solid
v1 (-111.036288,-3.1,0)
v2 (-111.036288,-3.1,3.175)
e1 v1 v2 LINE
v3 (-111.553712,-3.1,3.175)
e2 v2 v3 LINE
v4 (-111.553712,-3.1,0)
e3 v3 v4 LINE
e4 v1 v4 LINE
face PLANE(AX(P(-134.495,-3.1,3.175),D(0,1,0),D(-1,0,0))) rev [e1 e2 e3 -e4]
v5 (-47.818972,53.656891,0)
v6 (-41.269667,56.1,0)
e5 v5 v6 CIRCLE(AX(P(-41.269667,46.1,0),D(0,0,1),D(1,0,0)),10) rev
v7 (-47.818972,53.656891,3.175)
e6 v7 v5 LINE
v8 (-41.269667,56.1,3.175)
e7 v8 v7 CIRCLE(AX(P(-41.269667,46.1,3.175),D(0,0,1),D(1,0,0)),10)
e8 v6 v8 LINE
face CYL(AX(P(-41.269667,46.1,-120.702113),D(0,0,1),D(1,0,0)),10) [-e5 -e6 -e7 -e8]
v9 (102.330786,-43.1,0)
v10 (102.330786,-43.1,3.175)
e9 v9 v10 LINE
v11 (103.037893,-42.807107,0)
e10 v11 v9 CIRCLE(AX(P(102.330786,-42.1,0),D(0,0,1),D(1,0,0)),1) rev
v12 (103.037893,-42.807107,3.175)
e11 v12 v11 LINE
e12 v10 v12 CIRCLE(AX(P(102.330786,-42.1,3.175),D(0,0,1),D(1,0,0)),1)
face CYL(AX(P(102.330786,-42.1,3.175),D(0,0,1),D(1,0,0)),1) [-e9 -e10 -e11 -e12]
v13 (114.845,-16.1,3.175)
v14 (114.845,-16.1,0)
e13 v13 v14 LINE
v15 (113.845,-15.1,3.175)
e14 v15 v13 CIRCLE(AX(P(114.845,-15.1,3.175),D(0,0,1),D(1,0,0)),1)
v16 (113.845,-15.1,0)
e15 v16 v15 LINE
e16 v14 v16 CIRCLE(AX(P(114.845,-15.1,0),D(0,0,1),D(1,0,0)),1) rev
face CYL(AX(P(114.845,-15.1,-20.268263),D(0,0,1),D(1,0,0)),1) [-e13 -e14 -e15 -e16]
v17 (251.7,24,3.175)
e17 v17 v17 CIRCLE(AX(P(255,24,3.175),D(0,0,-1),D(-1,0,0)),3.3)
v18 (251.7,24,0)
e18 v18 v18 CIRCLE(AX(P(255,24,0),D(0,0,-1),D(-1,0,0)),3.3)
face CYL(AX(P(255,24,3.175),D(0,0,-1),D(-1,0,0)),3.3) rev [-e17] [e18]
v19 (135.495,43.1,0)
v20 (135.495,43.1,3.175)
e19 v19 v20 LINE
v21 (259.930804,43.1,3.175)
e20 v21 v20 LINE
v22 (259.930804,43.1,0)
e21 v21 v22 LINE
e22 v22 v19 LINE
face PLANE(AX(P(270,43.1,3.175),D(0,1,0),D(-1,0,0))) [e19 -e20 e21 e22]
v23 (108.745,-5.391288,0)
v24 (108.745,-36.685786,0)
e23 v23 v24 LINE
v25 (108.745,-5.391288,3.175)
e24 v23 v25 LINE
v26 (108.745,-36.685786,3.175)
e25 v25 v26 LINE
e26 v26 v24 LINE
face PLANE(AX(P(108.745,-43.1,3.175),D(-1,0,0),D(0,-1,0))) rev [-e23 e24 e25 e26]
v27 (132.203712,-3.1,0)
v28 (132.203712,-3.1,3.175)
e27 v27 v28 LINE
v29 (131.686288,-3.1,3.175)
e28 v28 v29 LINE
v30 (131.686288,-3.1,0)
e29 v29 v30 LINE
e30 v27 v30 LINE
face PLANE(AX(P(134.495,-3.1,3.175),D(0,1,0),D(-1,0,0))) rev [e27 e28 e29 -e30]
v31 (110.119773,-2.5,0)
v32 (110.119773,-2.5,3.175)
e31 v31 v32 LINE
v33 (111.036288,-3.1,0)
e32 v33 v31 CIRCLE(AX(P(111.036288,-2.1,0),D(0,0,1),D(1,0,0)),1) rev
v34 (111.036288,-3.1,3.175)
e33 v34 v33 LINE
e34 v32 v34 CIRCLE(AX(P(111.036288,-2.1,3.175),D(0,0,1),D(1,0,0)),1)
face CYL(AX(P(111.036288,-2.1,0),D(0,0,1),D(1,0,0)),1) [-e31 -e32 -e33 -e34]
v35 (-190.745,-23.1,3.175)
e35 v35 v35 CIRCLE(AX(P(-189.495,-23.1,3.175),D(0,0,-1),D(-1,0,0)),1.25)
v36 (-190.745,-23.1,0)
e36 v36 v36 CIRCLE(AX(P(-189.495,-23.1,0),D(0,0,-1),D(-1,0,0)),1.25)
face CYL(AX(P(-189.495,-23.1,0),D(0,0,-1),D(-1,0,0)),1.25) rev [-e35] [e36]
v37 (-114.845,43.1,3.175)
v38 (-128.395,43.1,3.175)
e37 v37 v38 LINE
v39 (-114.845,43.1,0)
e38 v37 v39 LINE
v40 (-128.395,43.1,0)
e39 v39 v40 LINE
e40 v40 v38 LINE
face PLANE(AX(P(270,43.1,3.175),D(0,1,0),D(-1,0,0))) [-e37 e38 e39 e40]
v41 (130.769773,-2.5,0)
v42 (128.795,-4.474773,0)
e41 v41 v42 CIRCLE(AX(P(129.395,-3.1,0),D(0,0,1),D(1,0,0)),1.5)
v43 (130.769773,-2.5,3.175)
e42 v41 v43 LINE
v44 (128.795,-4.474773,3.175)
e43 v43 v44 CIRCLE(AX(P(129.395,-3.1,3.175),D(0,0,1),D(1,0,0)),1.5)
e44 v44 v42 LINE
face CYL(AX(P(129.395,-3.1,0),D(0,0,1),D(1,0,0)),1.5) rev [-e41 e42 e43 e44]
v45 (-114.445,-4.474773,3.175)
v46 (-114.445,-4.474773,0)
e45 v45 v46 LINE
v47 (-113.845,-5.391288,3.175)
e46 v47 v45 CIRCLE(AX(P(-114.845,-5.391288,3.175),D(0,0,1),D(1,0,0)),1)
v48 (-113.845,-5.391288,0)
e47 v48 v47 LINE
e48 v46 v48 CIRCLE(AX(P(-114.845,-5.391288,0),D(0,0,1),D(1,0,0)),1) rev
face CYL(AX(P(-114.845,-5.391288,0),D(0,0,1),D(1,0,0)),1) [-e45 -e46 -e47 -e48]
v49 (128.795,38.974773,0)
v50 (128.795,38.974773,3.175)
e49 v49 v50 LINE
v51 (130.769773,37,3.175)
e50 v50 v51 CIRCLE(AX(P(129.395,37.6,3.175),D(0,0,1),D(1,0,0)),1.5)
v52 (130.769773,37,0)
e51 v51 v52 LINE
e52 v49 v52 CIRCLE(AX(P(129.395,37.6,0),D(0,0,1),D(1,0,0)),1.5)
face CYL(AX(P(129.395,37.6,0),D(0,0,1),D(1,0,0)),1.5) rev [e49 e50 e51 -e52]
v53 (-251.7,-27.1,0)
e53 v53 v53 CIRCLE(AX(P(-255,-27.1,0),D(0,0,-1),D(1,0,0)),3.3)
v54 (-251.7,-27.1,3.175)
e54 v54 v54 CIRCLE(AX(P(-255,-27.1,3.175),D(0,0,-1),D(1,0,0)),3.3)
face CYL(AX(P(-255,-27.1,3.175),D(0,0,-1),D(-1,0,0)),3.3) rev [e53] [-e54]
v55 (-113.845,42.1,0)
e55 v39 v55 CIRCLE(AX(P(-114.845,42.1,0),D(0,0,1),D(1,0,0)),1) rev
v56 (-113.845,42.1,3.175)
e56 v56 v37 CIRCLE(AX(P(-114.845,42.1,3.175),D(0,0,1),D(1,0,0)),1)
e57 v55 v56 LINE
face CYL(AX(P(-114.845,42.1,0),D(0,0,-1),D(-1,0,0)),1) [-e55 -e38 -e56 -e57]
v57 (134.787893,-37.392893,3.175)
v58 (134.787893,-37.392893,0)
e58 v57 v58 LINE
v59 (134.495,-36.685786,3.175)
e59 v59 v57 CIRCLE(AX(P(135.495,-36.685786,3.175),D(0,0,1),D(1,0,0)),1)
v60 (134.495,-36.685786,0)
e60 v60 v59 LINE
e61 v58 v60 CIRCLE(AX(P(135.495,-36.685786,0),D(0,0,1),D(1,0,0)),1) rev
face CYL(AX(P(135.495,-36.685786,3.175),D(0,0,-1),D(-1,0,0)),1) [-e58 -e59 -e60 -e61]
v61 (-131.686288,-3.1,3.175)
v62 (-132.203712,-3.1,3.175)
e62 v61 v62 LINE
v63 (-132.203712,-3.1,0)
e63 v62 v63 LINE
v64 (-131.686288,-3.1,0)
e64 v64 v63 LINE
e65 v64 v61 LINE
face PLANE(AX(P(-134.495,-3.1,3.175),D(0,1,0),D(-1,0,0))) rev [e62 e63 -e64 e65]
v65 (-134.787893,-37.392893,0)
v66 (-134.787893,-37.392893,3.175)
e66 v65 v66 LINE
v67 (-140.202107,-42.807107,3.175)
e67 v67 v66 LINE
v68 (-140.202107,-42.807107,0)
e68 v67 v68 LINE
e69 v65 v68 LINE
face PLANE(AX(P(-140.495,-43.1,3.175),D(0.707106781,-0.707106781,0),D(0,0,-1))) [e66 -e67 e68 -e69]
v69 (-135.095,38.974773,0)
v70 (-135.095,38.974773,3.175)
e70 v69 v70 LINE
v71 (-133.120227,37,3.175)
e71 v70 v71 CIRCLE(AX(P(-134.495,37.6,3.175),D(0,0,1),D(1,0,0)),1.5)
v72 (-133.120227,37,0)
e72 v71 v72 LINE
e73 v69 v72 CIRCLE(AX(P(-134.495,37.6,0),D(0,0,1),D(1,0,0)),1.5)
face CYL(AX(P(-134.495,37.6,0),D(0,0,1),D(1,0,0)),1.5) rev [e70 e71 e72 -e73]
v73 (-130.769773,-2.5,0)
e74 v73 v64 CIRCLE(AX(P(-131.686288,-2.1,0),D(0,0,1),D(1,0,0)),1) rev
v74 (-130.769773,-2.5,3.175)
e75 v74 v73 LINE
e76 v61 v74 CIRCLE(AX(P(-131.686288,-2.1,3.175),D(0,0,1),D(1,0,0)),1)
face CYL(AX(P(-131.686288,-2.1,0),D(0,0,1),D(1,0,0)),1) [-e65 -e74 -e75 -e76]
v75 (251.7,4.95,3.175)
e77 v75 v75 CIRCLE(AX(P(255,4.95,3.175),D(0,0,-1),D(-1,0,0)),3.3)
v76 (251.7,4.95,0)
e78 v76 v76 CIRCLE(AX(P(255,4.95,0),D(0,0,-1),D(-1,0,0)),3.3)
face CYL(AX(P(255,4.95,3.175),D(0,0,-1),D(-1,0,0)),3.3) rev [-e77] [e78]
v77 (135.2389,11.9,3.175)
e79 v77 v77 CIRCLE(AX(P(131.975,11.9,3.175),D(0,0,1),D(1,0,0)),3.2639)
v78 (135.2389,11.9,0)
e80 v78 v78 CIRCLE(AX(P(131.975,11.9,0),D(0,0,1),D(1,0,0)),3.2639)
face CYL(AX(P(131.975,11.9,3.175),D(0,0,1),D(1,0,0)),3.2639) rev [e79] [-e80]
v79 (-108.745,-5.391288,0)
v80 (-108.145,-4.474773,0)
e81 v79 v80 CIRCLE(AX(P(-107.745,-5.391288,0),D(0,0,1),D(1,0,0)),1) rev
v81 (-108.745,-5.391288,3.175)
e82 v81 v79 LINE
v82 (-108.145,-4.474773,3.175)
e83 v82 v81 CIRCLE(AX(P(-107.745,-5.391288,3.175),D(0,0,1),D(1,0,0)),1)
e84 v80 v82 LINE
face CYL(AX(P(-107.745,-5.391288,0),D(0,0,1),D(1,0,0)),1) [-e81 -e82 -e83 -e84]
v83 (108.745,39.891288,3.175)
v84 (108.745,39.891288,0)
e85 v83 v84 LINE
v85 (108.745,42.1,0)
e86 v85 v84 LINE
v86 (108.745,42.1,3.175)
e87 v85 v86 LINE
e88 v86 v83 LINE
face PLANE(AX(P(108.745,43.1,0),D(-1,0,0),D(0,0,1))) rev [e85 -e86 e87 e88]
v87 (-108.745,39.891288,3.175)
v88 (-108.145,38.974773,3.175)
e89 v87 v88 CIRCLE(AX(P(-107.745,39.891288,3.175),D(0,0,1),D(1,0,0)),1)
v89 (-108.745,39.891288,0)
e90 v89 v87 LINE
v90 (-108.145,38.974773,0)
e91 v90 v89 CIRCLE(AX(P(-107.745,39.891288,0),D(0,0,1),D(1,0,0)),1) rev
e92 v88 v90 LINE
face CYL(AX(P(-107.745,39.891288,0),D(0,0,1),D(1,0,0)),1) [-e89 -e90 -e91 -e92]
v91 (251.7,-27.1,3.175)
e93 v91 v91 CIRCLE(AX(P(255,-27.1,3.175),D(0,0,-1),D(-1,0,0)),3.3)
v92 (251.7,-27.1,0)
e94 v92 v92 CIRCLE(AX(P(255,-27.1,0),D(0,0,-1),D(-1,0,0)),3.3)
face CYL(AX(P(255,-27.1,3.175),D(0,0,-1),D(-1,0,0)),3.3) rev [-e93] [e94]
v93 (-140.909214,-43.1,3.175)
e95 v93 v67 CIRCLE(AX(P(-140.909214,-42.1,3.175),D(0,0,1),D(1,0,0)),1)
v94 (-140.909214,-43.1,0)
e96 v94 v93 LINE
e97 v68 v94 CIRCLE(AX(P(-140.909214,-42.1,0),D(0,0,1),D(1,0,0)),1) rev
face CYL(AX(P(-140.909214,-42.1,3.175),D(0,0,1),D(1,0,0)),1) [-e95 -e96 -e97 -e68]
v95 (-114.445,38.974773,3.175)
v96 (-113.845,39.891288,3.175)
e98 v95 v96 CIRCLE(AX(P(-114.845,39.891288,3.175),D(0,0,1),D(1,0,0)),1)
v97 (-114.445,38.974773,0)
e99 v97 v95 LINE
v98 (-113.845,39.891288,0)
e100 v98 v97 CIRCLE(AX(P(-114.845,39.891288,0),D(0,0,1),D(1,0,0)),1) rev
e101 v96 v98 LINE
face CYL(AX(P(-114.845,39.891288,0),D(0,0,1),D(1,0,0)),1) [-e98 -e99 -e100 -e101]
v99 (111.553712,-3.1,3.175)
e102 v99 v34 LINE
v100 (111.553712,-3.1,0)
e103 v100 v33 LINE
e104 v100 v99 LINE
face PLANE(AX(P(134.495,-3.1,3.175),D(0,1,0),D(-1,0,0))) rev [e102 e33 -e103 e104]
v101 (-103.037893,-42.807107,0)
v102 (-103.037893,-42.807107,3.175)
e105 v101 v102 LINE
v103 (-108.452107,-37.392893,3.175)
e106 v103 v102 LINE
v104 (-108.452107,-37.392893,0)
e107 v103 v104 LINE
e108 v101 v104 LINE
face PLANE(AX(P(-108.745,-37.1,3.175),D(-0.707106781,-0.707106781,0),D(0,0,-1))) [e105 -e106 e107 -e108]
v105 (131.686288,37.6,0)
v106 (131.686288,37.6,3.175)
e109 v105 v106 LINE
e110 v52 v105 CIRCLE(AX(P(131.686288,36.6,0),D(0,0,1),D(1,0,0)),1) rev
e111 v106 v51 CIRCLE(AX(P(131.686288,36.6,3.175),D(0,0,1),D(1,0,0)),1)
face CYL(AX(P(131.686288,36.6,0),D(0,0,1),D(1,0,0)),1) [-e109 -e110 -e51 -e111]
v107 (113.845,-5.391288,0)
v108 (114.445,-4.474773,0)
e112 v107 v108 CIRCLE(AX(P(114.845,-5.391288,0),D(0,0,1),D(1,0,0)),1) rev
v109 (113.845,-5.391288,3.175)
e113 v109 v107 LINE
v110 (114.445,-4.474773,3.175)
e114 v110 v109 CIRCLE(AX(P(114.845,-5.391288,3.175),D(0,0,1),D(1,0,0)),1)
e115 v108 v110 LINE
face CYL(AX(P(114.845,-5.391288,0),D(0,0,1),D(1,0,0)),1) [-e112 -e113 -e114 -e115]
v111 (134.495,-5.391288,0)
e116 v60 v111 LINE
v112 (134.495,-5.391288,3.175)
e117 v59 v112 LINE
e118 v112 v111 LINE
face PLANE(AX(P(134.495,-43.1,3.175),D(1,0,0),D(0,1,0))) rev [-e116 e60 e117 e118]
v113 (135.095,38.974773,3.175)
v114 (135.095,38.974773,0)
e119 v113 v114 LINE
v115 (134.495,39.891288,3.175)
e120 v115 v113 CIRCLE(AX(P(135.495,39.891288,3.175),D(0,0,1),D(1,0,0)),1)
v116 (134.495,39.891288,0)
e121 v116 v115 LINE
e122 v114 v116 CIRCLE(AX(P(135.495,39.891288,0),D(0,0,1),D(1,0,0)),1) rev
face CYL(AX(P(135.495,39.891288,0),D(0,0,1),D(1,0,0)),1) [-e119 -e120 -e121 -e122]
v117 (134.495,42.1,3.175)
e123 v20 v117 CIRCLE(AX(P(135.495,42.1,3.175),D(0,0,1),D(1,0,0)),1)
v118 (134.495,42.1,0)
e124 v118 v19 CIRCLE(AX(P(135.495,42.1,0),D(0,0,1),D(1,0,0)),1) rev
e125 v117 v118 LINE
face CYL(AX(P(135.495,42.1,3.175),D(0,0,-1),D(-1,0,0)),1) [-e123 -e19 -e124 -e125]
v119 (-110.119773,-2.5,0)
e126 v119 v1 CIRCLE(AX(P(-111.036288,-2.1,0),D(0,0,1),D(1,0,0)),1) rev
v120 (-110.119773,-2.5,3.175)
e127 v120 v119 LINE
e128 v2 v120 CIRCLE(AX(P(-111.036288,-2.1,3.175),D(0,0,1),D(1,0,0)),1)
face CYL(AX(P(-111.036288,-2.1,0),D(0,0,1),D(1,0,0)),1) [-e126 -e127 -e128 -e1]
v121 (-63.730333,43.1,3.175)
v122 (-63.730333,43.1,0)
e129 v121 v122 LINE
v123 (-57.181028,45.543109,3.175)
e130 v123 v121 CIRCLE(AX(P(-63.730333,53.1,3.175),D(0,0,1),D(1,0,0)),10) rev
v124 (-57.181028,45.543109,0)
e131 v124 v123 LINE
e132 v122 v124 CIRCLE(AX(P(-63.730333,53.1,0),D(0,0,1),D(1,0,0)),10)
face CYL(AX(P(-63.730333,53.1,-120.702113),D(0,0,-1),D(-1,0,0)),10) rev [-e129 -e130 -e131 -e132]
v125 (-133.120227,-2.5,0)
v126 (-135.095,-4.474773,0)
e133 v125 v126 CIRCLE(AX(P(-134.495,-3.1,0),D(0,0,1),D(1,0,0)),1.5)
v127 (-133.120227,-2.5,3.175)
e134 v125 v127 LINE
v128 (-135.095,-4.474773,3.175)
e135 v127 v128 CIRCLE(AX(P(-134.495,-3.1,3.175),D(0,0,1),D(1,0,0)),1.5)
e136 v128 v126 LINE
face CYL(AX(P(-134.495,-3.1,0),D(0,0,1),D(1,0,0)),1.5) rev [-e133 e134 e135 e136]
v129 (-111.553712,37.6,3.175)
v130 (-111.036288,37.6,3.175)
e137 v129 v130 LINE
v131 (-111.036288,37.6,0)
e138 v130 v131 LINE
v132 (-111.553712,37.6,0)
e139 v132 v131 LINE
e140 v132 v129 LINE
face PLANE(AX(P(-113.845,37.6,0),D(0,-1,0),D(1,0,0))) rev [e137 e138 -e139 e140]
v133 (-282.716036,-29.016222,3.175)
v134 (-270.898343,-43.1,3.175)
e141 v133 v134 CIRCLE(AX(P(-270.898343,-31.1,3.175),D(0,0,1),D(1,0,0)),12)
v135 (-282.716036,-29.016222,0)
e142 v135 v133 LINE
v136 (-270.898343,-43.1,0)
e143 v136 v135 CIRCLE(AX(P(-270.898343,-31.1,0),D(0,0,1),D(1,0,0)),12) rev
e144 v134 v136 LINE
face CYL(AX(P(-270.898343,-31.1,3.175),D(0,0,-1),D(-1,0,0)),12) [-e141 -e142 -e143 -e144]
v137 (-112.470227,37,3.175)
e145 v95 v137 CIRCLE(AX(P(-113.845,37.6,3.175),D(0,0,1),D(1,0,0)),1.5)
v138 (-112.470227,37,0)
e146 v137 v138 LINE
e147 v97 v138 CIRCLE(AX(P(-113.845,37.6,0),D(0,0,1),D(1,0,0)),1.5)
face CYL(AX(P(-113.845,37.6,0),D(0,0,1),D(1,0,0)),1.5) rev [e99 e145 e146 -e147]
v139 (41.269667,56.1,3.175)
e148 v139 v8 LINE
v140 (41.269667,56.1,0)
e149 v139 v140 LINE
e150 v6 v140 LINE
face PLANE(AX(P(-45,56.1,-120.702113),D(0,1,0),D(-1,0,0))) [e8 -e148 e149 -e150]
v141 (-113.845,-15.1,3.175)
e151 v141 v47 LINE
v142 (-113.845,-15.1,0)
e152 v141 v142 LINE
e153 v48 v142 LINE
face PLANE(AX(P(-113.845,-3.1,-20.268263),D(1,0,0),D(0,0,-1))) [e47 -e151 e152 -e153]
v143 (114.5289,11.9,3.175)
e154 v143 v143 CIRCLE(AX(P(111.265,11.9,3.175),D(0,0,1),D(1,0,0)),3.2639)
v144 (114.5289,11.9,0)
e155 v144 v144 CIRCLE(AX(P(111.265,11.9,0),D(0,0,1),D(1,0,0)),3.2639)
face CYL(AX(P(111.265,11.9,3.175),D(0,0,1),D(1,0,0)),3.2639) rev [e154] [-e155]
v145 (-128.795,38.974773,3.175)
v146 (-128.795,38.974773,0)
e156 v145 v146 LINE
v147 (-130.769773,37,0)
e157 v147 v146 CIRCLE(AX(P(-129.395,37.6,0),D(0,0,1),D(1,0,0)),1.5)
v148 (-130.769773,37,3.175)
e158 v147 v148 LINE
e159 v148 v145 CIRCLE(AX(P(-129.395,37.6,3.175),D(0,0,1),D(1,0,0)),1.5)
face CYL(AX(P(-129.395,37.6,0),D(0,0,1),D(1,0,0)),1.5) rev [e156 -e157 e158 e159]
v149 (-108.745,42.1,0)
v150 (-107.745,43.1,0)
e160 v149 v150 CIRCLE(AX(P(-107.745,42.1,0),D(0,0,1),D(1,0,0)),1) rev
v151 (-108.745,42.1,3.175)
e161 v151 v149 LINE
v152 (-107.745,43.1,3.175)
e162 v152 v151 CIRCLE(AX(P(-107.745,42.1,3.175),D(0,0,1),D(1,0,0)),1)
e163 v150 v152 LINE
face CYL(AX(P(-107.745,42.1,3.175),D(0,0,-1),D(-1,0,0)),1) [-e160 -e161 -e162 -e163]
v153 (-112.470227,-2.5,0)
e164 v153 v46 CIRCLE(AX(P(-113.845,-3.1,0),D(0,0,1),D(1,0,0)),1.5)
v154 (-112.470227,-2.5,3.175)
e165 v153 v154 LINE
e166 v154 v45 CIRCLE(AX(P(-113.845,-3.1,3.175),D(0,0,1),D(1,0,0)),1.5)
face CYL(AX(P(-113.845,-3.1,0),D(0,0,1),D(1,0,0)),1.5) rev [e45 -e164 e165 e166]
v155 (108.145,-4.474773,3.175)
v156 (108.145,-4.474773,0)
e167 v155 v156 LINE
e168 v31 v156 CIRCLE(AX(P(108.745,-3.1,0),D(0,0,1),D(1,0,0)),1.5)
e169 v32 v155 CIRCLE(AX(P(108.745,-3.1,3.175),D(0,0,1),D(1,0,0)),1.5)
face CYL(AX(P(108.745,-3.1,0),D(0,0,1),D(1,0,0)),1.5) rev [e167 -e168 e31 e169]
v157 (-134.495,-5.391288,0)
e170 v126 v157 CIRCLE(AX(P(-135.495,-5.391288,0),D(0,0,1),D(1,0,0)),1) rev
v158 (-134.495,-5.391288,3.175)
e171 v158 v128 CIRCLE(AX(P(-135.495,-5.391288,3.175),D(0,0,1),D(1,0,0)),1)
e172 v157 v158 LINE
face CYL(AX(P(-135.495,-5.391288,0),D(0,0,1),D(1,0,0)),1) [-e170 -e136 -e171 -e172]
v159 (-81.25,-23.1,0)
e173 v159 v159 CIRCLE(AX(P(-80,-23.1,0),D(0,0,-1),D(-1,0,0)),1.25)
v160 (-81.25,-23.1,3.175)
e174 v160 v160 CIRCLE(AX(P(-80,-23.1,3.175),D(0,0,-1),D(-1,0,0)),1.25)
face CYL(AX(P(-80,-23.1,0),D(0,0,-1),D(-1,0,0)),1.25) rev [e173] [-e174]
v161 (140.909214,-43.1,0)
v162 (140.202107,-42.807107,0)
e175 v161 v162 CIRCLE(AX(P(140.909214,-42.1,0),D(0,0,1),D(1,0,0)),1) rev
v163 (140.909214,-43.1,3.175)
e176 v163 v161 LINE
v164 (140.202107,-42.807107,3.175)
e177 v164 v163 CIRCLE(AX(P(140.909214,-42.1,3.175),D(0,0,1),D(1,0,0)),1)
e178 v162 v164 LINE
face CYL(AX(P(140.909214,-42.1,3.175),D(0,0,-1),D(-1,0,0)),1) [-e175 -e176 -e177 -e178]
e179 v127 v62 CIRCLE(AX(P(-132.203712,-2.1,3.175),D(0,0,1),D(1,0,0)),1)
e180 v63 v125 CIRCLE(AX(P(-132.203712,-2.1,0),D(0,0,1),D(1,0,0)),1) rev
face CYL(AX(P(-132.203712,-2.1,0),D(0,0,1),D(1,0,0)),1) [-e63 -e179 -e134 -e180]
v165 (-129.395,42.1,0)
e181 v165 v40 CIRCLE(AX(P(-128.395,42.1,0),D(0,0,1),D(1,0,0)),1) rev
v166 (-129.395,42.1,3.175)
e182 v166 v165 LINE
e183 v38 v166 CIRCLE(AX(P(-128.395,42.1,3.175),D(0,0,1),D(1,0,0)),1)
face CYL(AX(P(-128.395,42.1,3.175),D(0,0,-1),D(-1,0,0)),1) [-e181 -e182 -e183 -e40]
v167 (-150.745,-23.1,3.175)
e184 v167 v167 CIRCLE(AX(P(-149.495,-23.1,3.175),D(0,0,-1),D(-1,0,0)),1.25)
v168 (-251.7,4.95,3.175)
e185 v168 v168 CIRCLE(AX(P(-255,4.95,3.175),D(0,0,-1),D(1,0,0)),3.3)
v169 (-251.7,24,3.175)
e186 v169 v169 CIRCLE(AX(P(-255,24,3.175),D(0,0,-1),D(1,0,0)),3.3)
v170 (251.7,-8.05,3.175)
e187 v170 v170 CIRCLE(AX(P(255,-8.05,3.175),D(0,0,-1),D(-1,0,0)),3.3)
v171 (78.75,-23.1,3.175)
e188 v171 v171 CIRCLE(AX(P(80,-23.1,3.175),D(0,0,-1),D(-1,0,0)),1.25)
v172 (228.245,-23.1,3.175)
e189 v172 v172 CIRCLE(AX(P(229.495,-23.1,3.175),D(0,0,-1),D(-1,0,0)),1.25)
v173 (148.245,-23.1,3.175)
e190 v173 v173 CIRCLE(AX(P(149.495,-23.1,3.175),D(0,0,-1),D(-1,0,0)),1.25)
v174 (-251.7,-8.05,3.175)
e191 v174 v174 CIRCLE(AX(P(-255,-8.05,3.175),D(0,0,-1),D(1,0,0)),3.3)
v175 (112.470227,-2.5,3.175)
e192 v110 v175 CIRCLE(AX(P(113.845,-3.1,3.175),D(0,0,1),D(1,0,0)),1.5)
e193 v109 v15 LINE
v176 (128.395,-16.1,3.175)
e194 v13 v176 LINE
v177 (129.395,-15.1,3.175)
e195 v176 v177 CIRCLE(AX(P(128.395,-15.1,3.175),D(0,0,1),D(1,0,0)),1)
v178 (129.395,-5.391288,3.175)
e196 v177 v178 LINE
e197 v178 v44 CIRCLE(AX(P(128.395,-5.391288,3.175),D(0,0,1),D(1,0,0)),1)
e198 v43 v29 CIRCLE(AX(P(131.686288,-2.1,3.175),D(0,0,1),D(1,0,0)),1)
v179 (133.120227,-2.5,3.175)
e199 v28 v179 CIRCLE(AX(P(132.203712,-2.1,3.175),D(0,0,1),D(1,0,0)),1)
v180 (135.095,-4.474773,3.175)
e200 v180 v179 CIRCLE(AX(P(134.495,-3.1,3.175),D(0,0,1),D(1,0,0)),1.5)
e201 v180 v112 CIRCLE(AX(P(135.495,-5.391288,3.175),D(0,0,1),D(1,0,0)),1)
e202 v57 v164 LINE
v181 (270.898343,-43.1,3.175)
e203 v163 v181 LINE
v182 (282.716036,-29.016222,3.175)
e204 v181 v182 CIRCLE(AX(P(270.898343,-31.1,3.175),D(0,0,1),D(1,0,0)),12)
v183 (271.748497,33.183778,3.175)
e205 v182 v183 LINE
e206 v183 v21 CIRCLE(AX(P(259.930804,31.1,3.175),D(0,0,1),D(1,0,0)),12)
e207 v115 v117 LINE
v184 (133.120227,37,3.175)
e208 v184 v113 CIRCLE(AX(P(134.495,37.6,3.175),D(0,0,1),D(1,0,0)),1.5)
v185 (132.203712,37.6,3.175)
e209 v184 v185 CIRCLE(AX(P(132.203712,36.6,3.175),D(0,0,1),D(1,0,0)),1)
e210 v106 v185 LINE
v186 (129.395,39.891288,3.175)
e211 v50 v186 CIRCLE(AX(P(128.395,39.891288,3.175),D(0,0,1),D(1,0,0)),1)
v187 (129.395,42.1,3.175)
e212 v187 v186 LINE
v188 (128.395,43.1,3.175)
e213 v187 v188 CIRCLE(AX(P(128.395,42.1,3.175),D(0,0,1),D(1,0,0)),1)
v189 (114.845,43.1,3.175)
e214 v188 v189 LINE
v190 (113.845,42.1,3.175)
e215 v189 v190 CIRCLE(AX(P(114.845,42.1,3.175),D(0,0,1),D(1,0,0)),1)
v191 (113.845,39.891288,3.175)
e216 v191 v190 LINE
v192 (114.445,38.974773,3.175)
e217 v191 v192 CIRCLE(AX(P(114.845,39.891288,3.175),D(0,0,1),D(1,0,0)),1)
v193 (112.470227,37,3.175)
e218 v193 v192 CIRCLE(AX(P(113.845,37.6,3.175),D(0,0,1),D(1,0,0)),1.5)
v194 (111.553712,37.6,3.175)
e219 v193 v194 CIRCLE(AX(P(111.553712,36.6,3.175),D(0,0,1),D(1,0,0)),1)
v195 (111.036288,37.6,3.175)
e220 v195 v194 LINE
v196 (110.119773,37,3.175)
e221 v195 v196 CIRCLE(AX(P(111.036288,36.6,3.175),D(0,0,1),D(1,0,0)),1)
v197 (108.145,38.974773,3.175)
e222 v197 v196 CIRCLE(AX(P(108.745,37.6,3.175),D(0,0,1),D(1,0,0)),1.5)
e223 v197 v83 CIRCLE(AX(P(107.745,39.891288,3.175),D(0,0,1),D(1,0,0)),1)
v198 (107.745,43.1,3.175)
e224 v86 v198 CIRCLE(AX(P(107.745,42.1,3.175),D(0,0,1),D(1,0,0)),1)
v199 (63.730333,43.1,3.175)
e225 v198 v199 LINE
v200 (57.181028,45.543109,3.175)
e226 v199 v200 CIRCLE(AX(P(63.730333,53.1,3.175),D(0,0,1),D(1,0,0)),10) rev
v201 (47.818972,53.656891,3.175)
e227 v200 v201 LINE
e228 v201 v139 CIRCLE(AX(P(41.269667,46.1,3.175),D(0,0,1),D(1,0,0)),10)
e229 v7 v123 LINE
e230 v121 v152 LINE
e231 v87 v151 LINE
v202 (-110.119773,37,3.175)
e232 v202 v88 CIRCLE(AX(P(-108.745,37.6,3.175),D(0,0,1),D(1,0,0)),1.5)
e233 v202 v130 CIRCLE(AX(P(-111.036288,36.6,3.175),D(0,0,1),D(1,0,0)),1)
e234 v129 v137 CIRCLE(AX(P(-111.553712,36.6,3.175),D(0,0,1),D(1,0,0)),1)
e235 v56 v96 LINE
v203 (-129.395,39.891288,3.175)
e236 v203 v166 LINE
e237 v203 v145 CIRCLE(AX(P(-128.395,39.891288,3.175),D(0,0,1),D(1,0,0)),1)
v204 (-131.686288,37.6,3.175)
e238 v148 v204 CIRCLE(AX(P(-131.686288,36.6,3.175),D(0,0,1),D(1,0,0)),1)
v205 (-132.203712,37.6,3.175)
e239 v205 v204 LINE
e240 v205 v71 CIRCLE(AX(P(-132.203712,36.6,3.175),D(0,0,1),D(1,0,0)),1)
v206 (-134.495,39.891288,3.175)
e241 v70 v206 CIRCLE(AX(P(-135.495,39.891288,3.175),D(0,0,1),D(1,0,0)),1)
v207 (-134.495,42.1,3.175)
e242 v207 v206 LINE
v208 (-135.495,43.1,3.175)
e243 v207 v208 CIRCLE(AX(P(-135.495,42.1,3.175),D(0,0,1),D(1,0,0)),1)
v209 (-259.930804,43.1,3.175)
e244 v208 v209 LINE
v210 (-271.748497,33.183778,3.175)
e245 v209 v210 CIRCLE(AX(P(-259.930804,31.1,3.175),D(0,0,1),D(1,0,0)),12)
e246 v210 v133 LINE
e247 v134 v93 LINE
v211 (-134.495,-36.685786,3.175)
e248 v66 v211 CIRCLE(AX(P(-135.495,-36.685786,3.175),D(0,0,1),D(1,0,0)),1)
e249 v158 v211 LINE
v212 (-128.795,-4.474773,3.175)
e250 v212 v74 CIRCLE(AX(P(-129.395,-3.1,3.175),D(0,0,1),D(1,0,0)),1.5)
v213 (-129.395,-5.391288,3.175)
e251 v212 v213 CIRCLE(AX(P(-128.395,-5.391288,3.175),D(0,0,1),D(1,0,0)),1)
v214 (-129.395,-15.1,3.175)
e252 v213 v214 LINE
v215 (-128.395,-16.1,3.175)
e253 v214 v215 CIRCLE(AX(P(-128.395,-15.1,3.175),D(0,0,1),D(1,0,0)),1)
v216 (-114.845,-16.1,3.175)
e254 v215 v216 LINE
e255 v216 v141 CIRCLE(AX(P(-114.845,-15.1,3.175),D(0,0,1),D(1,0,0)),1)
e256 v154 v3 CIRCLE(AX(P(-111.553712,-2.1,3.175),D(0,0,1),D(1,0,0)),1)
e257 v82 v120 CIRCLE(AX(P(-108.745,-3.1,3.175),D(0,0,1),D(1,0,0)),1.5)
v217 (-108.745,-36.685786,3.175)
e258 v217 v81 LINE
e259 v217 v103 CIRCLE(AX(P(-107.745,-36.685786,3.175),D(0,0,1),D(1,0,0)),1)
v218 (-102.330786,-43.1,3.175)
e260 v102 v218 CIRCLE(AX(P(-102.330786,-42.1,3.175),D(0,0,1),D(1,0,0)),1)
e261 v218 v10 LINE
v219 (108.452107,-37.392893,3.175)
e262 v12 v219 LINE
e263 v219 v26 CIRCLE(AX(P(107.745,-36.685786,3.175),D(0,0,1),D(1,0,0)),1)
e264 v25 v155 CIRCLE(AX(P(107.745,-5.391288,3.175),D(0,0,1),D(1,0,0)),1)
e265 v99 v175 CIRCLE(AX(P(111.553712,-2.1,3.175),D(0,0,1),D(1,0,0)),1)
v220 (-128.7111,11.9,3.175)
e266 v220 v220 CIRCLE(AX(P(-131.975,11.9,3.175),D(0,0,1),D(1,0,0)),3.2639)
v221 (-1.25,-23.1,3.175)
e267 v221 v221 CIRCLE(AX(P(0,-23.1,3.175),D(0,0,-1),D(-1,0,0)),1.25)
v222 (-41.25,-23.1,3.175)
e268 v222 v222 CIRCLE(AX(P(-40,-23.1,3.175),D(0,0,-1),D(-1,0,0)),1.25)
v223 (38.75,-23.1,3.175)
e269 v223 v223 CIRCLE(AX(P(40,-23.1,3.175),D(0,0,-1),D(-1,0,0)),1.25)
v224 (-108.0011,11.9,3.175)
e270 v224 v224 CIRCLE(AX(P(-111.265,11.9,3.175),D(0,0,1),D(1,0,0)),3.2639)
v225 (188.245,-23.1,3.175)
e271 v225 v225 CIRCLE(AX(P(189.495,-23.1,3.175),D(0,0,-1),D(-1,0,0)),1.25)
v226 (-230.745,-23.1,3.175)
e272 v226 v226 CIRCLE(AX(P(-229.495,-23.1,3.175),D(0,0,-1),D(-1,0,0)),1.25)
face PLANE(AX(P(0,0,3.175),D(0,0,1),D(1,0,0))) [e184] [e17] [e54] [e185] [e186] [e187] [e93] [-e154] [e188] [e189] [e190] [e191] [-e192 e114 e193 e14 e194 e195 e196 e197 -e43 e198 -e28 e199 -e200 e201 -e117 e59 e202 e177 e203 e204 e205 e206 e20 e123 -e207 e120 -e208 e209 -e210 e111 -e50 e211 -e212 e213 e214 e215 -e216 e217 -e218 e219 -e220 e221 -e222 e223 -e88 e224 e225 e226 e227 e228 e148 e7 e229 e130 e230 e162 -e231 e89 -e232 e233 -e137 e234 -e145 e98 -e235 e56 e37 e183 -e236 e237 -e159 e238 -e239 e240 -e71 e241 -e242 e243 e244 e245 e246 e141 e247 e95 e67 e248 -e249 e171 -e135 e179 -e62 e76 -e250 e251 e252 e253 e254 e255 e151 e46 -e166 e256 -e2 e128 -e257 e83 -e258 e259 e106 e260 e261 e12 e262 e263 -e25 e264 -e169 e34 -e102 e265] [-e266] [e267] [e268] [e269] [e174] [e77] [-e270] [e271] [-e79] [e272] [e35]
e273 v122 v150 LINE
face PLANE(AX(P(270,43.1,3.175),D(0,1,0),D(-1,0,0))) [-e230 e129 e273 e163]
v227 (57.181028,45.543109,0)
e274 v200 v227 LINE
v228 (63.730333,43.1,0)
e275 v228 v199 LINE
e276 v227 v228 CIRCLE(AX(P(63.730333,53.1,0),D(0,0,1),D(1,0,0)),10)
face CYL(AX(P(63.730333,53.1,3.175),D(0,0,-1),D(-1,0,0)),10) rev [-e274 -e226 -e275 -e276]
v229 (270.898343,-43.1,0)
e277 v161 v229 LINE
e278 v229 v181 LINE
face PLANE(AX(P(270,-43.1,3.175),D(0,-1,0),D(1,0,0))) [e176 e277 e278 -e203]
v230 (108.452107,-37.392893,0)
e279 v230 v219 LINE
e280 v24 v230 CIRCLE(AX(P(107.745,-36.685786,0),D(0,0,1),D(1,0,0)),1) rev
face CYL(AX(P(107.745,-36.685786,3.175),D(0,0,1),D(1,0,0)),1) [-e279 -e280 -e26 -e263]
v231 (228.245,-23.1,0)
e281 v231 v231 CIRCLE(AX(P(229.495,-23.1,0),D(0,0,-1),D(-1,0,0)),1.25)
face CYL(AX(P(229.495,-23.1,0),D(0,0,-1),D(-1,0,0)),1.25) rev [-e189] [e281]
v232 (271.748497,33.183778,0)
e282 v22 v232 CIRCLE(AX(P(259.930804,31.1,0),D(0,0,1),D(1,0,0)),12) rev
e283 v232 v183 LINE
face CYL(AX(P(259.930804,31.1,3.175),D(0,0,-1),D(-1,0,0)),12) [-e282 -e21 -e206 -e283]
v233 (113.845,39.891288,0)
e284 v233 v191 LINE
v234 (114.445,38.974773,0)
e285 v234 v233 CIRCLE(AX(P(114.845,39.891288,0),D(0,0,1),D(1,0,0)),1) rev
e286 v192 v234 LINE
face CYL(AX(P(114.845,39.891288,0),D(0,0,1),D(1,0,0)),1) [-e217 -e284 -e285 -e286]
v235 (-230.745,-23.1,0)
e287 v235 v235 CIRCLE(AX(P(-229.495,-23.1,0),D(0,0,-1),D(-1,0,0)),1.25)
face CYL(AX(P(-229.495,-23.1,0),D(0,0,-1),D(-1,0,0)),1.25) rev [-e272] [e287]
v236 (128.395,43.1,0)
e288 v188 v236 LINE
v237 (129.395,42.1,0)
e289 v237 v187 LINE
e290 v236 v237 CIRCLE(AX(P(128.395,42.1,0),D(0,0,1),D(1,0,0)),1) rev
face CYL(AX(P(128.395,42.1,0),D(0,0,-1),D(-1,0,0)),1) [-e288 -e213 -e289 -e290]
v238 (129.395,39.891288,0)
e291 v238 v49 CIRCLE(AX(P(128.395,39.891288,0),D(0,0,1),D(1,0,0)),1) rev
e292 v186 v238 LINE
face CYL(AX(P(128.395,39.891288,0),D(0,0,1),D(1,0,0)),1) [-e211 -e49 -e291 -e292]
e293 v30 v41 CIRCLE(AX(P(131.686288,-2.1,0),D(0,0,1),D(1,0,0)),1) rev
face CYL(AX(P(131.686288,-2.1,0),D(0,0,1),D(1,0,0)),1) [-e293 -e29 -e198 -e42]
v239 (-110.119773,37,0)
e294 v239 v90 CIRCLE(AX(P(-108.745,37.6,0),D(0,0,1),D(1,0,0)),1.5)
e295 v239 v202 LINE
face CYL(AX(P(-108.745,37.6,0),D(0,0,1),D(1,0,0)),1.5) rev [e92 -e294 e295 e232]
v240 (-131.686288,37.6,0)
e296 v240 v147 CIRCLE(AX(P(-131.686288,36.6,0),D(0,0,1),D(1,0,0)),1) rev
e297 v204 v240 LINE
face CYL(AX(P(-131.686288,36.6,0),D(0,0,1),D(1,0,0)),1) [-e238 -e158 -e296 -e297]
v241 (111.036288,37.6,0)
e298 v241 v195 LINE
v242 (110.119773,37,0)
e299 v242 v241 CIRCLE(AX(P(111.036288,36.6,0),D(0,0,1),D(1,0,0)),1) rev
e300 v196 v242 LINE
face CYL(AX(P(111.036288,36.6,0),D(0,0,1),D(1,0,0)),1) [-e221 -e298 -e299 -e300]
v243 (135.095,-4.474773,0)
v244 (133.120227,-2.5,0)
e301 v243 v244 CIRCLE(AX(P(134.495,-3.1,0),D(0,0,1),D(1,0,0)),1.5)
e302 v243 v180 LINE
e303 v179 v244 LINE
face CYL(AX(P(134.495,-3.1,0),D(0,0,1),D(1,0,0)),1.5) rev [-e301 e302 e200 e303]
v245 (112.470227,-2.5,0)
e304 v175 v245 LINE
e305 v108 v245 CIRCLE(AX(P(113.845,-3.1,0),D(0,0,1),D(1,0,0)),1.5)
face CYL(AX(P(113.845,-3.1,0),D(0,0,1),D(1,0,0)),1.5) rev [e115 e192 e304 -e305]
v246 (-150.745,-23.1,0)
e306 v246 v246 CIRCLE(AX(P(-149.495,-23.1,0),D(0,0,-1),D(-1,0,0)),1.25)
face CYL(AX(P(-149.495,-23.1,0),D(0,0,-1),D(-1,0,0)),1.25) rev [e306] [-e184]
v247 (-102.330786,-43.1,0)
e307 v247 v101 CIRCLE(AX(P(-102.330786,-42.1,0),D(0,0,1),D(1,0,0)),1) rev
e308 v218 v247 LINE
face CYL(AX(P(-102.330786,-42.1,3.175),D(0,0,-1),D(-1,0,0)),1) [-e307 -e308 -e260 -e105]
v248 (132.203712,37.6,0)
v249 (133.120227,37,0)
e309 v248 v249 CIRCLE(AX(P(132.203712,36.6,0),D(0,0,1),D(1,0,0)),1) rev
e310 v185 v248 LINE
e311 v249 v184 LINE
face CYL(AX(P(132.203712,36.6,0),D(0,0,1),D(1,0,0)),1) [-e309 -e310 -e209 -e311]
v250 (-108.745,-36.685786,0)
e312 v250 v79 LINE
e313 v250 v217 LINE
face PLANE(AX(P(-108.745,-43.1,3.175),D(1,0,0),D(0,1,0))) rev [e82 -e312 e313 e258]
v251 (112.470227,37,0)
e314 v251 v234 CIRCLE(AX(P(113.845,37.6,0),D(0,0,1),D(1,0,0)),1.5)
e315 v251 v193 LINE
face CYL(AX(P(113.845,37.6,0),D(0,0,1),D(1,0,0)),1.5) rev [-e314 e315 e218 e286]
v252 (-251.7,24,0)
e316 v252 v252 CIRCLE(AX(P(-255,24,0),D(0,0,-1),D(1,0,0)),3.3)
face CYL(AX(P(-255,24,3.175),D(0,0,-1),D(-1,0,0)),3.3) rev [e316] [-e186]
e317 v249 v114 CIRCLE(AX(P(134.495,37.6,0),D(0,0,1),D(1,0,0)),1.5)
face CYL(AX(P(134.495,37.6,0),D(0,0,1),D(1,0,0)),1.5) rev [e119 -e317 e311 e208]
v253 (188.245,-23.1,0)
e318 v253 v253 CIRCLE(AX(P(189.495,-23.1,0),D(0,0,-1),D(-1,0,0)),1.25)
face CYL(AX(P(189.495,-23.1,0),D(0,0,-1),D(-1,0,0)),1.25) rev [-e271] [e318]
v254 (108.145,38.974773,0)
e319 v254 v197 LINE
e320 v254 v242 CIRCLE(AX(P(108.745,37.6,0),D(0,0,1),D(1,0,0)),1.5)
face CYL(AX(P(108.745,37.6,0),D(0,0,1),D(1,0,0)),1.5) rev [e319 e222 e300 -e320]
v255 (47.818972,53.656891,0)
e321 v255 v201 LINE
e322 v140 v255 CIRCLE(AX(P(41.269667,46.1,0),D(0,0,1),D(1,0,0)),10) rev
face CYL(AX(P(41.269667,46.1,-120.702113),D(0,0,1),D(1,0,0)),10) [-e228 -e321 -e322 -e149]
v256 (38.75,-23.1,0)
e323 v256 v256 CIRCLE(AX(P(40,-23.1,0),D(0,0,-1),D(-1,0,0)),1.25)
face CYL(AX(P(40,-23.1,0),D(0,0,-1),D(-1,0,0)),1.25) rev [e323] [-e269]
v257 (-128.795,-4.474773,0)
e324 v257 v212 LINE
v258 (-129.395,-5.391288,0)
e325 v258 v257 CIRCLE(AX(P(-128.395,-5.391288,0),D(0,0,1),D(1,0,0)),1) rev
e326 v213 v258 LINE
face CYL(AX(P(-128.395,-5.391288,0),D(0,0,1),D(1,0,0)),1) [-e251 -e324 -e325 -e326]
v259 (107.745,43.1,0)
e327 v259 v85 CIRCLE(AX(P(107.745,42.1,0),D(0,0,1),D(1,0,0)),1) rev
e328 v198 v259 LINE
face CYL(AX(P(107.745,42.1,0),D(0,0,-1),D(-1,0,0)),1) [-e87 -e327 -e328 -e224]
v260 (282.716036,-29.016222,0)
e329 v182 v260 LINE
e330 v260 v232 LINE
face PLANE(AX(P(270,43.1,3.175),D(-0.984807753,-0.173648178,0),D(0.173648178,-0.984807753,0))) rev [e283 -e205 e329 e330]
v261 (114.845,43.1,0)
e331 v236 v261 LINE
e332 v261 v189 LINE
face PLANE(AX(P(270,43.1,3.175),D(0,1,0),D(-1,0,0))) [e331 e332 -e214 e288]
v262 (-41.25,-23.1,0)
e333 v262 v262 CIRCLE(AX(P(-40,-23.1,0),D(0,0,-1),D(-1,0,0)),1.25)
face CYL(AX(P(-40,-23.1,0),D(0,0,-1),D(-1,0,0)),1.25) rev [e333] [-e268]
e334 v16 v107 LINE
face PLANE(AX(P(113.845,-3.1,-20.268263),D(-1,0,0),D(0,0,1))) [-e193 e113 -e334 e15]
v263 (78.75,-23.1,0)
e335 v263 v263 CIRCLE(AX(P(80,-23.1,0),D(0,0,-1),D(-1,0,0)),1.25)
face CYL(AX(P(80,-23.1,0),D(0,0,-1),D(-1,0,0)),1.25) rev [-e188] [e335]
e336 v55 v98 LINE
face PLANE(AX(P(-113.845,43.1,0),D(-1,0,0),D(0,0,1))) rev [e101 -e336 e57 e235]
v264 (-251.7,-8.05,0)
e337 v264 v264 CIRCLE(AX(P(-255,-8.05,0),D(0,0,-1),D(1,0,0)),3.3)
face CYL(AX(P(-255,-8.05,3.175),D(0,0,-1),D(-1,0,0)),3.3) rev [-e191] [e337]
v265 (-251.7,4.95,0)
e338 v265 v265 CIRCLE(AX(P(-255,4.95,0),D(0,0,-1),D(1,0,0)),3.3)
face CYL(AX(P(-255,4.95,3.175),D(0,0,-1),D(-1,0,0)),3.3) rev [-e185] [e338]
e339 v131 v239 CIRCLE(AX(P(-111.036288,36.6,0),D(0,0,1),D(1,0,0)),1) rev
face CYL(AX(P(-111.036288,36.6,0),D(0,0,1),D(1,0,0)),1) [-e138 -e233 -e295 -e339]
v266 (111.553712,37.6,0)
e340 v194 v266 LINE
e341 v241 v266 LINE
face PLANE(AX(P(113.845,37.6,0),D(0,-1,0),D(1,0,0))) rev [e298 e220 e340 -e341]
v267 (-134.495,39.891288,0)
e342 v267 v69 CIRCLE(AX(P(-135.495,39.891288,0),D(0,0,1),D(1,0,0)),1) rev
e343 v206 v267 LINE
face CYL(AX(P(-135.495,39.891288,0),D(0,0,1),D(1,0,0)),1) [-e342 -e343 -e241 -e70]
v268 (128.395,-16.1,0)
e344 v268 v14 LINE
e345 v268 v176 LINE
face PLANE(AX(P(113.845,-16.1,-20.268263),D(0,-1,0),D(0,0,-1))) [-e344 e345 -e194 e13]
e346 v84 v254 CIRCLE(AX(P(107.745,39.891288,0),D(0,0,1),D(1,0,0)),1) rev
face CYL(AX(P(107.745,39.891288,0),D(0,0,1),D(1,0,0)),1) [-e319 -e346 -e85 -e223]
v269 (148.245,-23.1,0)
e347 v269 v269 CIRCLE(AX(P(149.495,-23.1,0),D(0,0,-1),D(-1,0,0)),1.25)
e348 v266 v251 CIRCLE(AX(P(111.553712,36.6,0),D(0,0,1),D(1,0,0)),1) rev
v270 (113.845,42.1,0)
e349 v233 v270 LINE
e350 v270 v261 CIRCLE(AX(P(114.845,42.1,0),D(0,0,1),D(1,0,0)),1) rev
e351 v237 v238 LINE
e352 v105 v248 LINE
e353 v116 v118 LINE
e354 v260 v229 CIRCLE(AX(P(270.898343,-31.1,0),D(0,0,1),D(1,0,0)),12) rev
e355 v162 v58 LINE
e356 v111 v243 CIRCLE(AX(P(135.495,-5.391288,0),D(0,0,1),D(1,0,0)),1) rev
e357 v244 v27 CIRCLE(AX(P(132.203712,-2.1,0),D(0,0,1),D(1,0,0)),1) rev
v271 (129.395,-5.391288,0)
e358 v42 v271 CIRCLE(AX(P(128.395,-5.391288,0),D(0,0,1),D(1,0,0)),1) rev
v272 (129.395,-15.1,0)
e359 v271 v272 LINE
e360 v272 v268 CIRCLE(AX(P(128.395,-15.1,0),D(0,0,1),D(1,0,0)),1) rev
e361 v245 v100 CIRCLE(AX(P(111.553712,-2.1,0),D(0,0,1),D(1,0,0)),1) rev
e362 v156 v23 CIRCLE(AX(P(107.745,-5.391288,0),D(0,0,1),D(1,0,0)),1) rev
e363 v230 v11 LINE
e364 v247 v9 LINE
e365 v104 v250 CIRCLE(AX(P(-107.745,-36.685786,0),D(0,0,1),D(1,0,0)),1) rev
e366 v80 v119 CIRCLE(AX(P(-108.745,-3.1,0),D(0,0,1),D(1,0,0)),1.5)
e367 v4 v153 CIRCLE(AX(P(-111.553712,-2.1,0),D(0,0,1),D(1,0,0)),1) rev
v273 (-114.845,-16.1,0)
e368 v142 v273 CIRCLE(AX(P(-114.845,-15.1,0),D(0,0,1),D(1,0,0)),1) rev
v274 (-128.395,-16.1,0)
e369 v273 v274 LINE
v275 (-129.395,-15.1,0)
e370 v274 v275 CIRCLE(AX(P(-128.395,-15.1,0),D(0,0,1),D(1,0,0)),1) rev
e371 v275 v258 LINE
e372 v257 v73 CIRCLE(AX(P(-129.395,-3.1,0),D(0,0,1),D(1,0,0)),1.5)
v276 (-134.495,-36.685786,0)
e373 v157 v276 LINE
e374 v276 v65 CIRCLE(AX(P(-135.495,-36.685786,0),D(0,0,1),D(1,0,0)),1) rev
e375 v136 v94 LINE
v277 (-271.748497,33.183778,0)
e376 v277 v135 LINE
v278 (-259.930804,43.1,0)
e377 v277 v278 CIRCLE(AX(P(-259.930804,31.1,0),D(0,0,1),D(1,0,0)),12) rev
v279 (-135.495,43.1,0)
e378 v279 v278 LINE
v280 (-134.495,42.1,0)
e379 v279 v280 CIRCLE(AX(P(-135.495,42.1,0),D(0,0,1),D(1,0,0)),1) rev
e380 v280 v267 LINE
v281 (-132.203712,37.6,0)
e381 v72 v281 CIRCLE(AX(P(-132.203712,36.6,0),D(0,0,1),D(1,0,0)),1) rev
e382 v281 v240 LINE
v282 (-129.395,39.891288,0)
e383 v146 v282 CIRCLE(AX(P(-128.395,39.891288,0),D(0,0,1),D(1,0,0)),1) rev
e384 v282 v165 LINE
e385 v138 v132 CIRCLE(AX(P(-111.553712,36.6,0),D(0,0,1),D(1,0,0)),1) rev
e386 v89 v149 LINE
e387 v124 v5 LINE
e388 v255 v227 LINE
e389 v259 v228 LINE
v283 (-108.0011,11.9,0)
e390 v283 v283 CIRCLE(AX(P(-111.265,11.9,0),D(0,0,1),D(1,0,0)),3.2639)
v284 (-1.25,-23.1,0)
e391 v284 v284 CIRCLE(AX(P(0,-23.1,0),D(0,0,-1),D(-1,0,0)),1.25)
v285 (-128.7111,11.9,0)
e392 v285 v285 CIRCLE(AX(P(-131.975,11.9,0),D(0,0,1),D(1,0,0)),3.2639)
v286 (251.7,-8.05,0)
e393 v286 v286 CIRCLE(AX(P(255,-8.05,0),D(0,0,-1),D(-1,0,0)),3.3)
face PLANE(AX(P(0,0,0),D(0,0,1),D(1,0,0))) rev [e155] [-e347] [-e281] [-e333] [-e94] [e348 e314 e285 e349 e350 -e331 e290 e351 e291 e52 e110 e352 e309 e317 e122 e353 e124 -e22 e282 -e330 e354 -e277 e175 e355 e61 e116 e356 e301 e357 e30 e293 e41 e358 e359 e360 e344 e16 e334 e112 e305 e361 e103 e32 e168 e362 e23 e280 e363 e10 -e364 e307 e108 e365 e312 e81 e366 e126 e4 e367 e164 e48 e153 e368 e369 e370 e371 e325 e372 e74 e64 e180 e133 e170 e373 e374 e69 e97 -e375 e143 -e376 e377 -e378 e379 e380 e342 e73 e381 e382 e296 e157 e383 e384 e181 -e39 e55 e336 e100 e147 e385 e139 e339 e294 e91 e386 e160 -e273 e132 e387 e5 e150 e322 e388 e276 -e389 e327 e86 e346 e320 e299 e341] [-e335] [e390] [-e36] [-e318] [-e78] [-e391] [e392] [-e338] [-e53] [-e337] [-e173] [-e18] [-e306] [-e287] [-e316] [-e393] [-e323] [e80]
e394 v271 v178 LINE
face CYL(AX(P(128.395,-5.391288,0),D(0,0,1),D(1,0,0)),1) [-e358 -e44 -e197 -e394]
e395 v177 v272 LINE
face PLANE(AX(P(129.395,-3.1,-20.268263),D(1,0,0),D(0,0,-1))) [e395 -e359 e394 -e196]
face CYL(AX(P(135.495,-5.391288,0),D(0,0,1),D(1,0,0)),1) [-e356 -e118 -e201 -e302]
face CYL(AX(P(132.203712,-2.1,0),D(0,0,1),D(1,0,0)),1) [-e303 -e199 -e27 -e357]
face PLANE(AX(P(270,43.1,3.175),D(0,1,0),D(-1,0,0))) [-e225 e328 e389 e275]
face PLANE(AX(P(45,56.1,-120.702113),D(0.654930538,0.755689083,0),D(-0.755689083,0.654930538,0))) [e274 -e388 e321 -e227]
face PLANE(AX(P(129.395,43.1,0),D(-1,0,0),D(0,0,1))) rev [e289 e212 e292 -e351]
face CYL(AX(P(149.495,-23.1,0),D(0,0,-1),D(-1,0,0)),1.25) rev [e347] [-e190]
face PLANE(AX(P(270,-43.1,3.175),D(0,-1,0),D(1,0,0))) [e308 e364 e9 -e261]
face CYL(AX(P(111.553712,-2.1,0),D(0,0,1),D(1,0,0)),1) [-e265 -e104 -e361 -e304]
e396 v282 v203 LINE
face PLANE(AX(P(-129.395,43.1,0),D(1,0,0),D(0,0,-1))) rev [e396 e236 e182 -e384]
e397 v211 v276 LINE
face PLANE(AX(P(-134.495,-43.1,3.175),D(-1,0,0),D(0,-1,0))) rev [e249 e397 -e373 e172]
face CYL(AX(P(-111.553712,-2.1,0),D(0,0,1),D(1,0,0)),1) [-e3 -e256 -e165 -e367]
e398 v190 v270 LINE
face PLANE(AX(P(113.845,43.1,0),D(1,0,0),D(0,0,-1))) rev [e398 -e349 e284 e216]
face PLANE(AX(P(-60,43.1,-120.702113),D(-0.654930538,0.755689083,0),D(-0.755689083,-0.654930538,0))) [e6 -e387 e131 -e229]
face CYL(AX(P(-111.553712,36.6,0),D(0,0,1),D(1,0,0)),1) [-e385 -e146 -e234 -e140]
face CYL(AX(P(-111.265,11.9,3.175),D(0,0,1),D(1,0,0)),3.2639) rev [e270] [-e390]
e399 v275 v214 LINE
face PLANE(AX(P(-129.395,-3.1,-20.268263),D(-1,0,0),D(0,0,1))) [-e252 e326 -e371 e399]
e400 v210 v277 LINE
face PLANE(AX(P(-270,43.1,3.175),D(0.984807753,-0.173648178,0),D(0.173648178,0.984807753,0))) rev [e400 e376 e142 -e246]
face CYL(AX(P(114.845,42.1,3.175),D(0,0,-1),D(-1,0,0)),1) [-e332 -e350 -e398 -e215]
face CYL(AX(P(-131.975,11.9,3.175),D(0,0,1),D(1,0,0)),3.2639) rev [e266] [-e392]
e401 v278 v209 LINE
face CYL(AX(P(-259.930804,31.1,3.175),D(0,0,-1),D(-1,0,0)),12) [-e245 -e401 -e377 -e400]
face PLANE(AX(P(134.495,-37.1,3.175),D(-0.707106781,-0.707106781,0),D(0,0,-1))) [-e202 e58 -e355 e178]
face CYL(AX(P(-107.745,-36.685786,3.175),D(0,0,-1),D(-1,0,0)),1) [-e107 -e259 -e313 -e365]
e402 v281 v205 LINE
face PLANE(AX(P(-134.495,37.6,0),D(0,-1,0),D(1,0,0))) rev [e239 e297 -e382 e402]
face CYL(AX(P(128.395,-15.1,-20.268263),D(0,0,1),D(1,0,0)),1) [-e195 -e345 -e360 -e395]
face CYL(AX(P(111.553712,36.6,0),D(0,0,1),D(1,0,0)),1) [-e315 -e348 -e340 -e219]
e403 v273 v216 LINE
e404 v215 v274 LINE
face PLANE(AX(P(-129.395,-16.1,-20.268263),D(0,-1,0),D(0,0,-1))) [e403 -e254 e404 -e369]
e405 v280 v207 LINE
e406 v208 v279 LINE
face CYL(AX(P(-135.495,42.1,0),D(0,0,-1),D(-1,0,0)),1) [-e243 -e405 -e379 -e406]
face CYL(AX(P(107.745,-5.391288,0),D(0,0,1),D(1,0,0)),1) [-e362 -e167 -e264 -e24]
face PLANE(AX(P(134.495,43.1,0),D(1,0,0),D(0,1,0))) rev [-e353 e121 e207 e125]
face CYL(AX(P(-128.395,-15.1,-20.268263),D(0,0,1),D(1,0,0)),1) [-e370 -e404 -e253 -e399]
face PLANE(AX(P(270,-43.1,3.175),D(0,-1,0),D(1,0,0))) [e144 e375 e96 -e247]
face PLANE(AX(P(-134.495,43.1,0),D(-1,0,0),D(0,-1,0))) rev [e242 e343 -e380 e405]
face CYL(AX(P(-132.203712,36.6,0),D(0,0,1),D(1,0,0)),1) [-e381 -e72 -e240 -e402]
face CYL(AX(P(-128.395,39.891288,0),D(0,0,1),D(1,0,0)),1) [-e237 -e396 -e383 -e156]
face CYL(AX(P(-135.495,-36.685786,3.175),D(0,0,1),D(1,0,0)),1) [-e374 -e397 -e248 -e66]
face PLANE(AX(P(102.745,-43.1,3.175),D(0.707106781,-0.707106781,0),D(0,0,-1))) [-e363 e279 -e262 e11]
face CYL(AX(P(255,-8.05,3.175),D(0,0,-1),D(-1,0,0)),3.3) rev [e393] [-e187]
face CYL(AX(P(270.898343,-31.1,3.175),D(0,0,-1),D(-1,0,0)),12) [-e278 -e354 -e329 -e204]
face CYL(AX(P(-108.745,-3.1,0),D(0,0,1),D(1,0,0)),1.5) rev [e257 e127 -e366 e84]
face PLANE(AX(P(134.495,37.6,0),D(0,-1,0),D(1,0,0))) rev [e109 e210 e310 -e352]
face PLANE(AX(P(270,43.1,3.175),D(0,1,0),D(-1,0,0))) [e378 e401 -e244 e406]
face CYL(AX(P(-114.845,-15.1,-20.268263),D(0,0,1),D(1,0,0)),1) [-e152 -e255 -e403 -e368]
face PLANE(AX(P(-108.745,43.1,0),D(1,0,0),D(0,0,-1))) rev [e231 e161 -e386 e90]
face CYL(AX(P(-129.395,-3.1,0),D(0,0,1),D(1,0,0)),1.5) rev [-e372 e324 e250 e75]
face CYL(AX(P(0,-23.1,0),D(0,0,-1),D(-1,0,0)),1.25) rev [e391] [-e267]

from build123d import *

# Parameters (mm, degrees)
SKETCH1_W               = 540
SKETCH1_H               = 86.2
BOSS_EXTRUDE1_DEPTH     = 3.175
SKETCH2_W               = 25.75
SKETCH2_H               = 40
CUT_EXTRUDE1_DEPTH      = 274.436812856
F_1_4_CLEARANCE_HOLE1_D = 6.5278
DRAFT1_ANGLE            = 10
FILLET1_R               = 12
CHAMFER1_SIZE           = 6
SKETCH5_R               = 3.3
CUT_EXTRUDE2_DEPTH      = 287.180297864
BOSS_EXTRUDE2_DEPTH     = 3.175
FILLET2_R               = 10
SKETCH8_W               = 15.55
SKETCH8_H               = 13
BOSS_EXTRUDE3_DEPTH     = 3.175
SKETCH9_R               = 1.5
CUT_EXTRUDE3_DEPTH      = 289.424622537
FILLET3_R               = 1
SKETCH10_W              = 5.1
SKETCH10_H              = 5.5
CUT_EXTRUDE4_DEPTH      = 289.424622537
SKETCH11_R              = 1.5
CUT_EXTRUDE5_DEPTH      = 289.424622537
FILLET4_R               = 1
M3X0_5_TAPPED_HOLE1_D   = 2.5


with BuildPart() as part:
    # Sketch1 → Boss-Extrude1 (new body)
    with BuildSketch(Plane.XY):
        Rectangle(SKETCH1_W, SKETCH1_H)
    extrude(amount=BOSS_EXTRUDE1_DEPTH)

    # Sketch2 → Cut-Extrude1 (cut, through all)
    with BuildSketch(Plane.XY.offset(3.175)):
        with Locations((121.62, -23.1)):
            Rectangle(SKETCH2_W, SKETCH2_H)
        with Locations((-121.62, -23.1)):
            Rectangle(SKETCH2_W, SKETCH2_H)
    extrude(amount=-CUT_EXTRUDE1_DEPTH, mode=Mode.SUBTRACT)

    # 1/4 Clearance Hole1 (through all)
    with Locations(Plane.XY.offset(3.175)):
        with Locations((-131.975, 11.9), (-111.265, 11.9), (111.265, 11.9), (131.975, 11.9)):
            Hole(F_1_4_CLEARANCE_HOLE1_D / 2)

    # Draft1
    draft1_faces = [part.faces().sort_by_distance(p)[0] for p in [
        (270, 0, 1.5875),
        (-270, 0, 1.5875),
    ]]
    draft(draft1_faces, Plane(origin=(270, 43.1, 3.175), x_dir=(1, 0, 0), z_dir=(0, 1, 0)), DRAFT1_ANGLE)

    # Fillet1
    fillet1_edges = [part.edges().sort_by_distance(p)[0] for p in [
        (-285.199385737, -43.1, 1.5875),
        (-270, 43.1, 1.5875),
        (270, 43.1, 1.5875),
        (285.199385737, -43.1, 1.5875),
    ]]
    fillet(fillet1_edges, radius=FILLET1_R)

    # Chamfer1
    chamfer1_edges = [part.edges().sort_by_distance(p)[0] for p in [
        (-134.495, -43.1, 1.5875),
        (134.495, -43.1, 1.5875),
        (108.745, -43.1, 1.5875),
        (-108.745, -43.1, 1.5875),
    ]]
    chamfer(chamfer1_edges, length=CHAMFER1_SIZE)

    # Sketch5 → Cut-Extrude2 (cut, through all)
    with BuildSketch(Plane(origin=(0, 0, 0), x_dir=(-1, 0, 0), z_dir=(0, 0, -1))):
        with Locations((-255, 24)):
            Circle(SKETCH5_R)
        with Locations((-255, 4.95)):
            Circle(SKETCH5_R)
        with Locations((-255, -8.05)):
            Circle(SKETCH5_R)
        with Locations((-255, -27.1)):
            Circle(SKETCH5_R)
        with Locations(Location((255, -27.1, 0), (0, 0, 180))):
            Circle(SKETCH5_R)
        with Locations(Location((255, -8.05, 0), (0, 0, 180))):
            Circle(SKETCH5_R)
        with Locations(Location((255, 4.95, 0), (0, 0, 180))):
            Circle(SKETCH5_R)
        with Locations(Location((255, 24, 0), (0, 0, 180))):
            Circle(SKETCH5_R)
    extrude(amount=-CUT_EXTRUDE2_DEPTH, mode=Mode.SUBTRACT)

    # Sketch6 → Boss-Extrude2 (add)
    with BuildSketch(Plane.XY.offset(3.175)):
        Polygon((-60, 43.1), (-45, 56.1), (45, 56.1), (60, 43.1), align=None)
    extrude(amount=-BOSS_EXTRUDE2_DEPTH)

    # Fillet2
    fillet2_edges = [part.edges().sort_by_distance(p)[0] for p in [
        (60, 43.1, 1.5875),
        (-60, 43.1, 1.5875),
        (-45, 56.1, 1.5875),
        (45, 56.1, 1.5875),
    ]]
    fillet(fillet2_edges, radius=FILLET2_R)

    # Sketch8 → Boss-Extrude3 (add)
    with BuildSketch(Plane.XY.offset(3.175)):
        with Locations((-121.62, -9.6)):
            Rectangle(SKETCH8_W, SKETCH8_H)
        with Locations((121.62, -9.6)):
            Rectangle(SKETCH8_W, SKETCH8_H)
    extrude(amount=-BOSS_EXTRUDE3_DEPTH)

    # Sketch9 → Cut-Extrude3 (cut, through all)
    with BuildSketch(Plane.XY.offset(3.175)):
        with Locations((-134.495, -3.1)):
            Circle(SKETCH9_R)
        with Locations((-129.395, -3.1)):
            Circle(SKETCH9_R)
        with Locations((-113.845, -3.1)):
            Circle(SKETCH9_R)
        with Locations((-108.745, -3.1)):
            Circle(SKETCH9_R)
        with Locations((113.845, -3.1)):
            Circle(SKETCH9_R)
        with Locations((108.745, -3.1)):
            Circle(SKETCH9_R)
        with Locations((134.495, -3.1)):
            Circle(SKETCH9_R)
        with Locations((129.395, -3.1)):
            Circle(SKETCH9_R)
    extrude(amount=-CUT_EXTRUDE3_DEPTH, mode=Mode.SUBTRACT)

    # Fillet3
    fillet3_edges = [part.edges().sort_by_distance(p)[0] for p in [
        (-129.395, -16.1, 1.5875),
        (-113.845, -16.1, 1.5875),
        (113.845, -16.1, 1.5875),
        (129.395, -16.1, 1.5875),
        (129.395, -4.6, 1.5875),
        (113.845, -4.6, 1.5875),
        (-113.845, -4.6, 1.5875),
        (-129.395, -4.6, 1.5875),
        (-132.995, -3.1, 1.5875),
        (-134.495, -4.6, 1.5875),
        (110.245, -3.1, 1.5875),
        (108.745, -4.6, 1.5875),
        (132.995, -3.1, 1.5875),
        (134.495, -4.6, 1.5875),
        (130.895, -3.1, 1.5875),
        (112.345, -3.1, 1.5875),
        (-108.745, -4.6, 1.5875),
        (-110.245, -3.1, 1.5875),
        (-112.345, -3.1, 1.5875),
        (-130.895, -3.1, 1.5875),
        (-140.495, -43.1, 1.5875),
        (-134.495, -37.1, 1.5875),
        (-108.745, -37.1, 1.5875),
        (102.745, -43.1, 1.5875),
        (-102.745, -43.1, 1.5875),
        (134.495, -37.1, 1.5875),
        (140.495, -43.1, 1.5875),
        (108.745, -37.1, 1.5875),
    ]]
    fillet(fillet3_edges, radius=FILLET3_R)

    # Sketch10 → Cut-Extrude4 (cut, through all)
    with BuildSketch(Plane.XY.offset(3.175)):
        with Locations((-131.945, 40.35)):
            Rectangle(SKETCH10_W, SKETCH10_H)
        with Locations((-111.295, 40.35)):
            Rectangle(SKETCH10_W, SKETCH10_H)
        with Locations((111.295, 40.35)):
            Rectangle(SKETCH10_W, SKETCH10_H)
        with Locations((131.945, 40.35)):
            Rectangle(SKETCH10_W, SKETCH10_H)
    extrude(amount=-CUT_EXTRUDE4_DEPTH, mode=Mode.SUBTRACT)

    # Sketch11 → Cut-Extrude5 (cut, through all)
    with BuildSketch(Plane.XY.offset(3.175)):
        with Locations((-134.495, 37.6)):
            Circle(SKETCH11_R)
        with Locations((-129.395, 37.6)):
            Circle(SKETCH11_R)
        with Locations((-113.845, 37.6)):
            Circle(SKETCH11_R)
        with Locations((-108.745, 37.6)):
            Circle(SKETCH11_R)
        with Locations((113.845, 37.6)):
            Circle(SKETCH11_R)
        with Locations((108.745, 37.6)):
            Circle(SKETCH11_R)
        with Locations((129.395, 37.6)):
            Circle(SKETCH11_R)
        with Locations((134.495, 37.6)):
            Circle(SKETCH11_R)
    extrude(amount=-CUT_EXTRUDE5_DEPTH, mode=Mode.SUBTRACT)

    # Fillet4
    fillet4_edges = [part.edges().sort_by_distance(p)[0] for p in [
        (-134.495, 43.1, 1.5875),
        (-129.395, 43.1, 1.5875),
        (-113.845, 43.1, 1.5875),
        (-108.745, 43.1, 1.5875),
        (108.745, 43.1, 1.5875),
        (113.845, 43.1, 1.5875),
        (129.395, 43.1, 1.5875),
        (134.495, 43.1, 1.5875),
        (-130.895, 37.6, 1.5875),
        (-132.995, 37.6, 1.5875),
        (-112.345, 37.6, 1.5875),
        (-110.245, 37.6, 1.5875),
        (108.745, 39.1, 1.5875),
        (112.345, 37.6, 1.5875),
        (129.395, 39.1, 1.5875),
        (132.995, 37.6, 1.5875),
        (-134.495, 39.1, 1.5875),
        (134.495, 39.1, 1.5875),
        (130.895, 37.6, 1.5875),
        (110.245, 37.6, 1.5875),
        (113.845, 39.1, 1.5875),
        (-108.745, 39.1, 1.5875),
        (-113.845, 39.1, 1.5875),
        (-129.395, 39.1, 1.5875),
    ]]
    fillet(fillet4_edges, radius=FILLET4_R)

    # M3x0.5 Tapped Hole1 (through all)
    with Locations(Plane(origin=(0, 0, 0), x_dir=(-1, 0, 0), z_dir=(0, 0, -1))):
        with Locations((-229.495, -23.1), (-189.495, -23.1), (-149.495, -23.1), (-80, -23.1), (-40, -23.1), (0, -23.1), (40, -23.1), (80, -23.1), (149.495, -23.1), (189.495, -23.1), (229.495, -23.1)):
            Hole(M3X0_5_TAPPED_HOLE1_D / 2)


solid = part.part
